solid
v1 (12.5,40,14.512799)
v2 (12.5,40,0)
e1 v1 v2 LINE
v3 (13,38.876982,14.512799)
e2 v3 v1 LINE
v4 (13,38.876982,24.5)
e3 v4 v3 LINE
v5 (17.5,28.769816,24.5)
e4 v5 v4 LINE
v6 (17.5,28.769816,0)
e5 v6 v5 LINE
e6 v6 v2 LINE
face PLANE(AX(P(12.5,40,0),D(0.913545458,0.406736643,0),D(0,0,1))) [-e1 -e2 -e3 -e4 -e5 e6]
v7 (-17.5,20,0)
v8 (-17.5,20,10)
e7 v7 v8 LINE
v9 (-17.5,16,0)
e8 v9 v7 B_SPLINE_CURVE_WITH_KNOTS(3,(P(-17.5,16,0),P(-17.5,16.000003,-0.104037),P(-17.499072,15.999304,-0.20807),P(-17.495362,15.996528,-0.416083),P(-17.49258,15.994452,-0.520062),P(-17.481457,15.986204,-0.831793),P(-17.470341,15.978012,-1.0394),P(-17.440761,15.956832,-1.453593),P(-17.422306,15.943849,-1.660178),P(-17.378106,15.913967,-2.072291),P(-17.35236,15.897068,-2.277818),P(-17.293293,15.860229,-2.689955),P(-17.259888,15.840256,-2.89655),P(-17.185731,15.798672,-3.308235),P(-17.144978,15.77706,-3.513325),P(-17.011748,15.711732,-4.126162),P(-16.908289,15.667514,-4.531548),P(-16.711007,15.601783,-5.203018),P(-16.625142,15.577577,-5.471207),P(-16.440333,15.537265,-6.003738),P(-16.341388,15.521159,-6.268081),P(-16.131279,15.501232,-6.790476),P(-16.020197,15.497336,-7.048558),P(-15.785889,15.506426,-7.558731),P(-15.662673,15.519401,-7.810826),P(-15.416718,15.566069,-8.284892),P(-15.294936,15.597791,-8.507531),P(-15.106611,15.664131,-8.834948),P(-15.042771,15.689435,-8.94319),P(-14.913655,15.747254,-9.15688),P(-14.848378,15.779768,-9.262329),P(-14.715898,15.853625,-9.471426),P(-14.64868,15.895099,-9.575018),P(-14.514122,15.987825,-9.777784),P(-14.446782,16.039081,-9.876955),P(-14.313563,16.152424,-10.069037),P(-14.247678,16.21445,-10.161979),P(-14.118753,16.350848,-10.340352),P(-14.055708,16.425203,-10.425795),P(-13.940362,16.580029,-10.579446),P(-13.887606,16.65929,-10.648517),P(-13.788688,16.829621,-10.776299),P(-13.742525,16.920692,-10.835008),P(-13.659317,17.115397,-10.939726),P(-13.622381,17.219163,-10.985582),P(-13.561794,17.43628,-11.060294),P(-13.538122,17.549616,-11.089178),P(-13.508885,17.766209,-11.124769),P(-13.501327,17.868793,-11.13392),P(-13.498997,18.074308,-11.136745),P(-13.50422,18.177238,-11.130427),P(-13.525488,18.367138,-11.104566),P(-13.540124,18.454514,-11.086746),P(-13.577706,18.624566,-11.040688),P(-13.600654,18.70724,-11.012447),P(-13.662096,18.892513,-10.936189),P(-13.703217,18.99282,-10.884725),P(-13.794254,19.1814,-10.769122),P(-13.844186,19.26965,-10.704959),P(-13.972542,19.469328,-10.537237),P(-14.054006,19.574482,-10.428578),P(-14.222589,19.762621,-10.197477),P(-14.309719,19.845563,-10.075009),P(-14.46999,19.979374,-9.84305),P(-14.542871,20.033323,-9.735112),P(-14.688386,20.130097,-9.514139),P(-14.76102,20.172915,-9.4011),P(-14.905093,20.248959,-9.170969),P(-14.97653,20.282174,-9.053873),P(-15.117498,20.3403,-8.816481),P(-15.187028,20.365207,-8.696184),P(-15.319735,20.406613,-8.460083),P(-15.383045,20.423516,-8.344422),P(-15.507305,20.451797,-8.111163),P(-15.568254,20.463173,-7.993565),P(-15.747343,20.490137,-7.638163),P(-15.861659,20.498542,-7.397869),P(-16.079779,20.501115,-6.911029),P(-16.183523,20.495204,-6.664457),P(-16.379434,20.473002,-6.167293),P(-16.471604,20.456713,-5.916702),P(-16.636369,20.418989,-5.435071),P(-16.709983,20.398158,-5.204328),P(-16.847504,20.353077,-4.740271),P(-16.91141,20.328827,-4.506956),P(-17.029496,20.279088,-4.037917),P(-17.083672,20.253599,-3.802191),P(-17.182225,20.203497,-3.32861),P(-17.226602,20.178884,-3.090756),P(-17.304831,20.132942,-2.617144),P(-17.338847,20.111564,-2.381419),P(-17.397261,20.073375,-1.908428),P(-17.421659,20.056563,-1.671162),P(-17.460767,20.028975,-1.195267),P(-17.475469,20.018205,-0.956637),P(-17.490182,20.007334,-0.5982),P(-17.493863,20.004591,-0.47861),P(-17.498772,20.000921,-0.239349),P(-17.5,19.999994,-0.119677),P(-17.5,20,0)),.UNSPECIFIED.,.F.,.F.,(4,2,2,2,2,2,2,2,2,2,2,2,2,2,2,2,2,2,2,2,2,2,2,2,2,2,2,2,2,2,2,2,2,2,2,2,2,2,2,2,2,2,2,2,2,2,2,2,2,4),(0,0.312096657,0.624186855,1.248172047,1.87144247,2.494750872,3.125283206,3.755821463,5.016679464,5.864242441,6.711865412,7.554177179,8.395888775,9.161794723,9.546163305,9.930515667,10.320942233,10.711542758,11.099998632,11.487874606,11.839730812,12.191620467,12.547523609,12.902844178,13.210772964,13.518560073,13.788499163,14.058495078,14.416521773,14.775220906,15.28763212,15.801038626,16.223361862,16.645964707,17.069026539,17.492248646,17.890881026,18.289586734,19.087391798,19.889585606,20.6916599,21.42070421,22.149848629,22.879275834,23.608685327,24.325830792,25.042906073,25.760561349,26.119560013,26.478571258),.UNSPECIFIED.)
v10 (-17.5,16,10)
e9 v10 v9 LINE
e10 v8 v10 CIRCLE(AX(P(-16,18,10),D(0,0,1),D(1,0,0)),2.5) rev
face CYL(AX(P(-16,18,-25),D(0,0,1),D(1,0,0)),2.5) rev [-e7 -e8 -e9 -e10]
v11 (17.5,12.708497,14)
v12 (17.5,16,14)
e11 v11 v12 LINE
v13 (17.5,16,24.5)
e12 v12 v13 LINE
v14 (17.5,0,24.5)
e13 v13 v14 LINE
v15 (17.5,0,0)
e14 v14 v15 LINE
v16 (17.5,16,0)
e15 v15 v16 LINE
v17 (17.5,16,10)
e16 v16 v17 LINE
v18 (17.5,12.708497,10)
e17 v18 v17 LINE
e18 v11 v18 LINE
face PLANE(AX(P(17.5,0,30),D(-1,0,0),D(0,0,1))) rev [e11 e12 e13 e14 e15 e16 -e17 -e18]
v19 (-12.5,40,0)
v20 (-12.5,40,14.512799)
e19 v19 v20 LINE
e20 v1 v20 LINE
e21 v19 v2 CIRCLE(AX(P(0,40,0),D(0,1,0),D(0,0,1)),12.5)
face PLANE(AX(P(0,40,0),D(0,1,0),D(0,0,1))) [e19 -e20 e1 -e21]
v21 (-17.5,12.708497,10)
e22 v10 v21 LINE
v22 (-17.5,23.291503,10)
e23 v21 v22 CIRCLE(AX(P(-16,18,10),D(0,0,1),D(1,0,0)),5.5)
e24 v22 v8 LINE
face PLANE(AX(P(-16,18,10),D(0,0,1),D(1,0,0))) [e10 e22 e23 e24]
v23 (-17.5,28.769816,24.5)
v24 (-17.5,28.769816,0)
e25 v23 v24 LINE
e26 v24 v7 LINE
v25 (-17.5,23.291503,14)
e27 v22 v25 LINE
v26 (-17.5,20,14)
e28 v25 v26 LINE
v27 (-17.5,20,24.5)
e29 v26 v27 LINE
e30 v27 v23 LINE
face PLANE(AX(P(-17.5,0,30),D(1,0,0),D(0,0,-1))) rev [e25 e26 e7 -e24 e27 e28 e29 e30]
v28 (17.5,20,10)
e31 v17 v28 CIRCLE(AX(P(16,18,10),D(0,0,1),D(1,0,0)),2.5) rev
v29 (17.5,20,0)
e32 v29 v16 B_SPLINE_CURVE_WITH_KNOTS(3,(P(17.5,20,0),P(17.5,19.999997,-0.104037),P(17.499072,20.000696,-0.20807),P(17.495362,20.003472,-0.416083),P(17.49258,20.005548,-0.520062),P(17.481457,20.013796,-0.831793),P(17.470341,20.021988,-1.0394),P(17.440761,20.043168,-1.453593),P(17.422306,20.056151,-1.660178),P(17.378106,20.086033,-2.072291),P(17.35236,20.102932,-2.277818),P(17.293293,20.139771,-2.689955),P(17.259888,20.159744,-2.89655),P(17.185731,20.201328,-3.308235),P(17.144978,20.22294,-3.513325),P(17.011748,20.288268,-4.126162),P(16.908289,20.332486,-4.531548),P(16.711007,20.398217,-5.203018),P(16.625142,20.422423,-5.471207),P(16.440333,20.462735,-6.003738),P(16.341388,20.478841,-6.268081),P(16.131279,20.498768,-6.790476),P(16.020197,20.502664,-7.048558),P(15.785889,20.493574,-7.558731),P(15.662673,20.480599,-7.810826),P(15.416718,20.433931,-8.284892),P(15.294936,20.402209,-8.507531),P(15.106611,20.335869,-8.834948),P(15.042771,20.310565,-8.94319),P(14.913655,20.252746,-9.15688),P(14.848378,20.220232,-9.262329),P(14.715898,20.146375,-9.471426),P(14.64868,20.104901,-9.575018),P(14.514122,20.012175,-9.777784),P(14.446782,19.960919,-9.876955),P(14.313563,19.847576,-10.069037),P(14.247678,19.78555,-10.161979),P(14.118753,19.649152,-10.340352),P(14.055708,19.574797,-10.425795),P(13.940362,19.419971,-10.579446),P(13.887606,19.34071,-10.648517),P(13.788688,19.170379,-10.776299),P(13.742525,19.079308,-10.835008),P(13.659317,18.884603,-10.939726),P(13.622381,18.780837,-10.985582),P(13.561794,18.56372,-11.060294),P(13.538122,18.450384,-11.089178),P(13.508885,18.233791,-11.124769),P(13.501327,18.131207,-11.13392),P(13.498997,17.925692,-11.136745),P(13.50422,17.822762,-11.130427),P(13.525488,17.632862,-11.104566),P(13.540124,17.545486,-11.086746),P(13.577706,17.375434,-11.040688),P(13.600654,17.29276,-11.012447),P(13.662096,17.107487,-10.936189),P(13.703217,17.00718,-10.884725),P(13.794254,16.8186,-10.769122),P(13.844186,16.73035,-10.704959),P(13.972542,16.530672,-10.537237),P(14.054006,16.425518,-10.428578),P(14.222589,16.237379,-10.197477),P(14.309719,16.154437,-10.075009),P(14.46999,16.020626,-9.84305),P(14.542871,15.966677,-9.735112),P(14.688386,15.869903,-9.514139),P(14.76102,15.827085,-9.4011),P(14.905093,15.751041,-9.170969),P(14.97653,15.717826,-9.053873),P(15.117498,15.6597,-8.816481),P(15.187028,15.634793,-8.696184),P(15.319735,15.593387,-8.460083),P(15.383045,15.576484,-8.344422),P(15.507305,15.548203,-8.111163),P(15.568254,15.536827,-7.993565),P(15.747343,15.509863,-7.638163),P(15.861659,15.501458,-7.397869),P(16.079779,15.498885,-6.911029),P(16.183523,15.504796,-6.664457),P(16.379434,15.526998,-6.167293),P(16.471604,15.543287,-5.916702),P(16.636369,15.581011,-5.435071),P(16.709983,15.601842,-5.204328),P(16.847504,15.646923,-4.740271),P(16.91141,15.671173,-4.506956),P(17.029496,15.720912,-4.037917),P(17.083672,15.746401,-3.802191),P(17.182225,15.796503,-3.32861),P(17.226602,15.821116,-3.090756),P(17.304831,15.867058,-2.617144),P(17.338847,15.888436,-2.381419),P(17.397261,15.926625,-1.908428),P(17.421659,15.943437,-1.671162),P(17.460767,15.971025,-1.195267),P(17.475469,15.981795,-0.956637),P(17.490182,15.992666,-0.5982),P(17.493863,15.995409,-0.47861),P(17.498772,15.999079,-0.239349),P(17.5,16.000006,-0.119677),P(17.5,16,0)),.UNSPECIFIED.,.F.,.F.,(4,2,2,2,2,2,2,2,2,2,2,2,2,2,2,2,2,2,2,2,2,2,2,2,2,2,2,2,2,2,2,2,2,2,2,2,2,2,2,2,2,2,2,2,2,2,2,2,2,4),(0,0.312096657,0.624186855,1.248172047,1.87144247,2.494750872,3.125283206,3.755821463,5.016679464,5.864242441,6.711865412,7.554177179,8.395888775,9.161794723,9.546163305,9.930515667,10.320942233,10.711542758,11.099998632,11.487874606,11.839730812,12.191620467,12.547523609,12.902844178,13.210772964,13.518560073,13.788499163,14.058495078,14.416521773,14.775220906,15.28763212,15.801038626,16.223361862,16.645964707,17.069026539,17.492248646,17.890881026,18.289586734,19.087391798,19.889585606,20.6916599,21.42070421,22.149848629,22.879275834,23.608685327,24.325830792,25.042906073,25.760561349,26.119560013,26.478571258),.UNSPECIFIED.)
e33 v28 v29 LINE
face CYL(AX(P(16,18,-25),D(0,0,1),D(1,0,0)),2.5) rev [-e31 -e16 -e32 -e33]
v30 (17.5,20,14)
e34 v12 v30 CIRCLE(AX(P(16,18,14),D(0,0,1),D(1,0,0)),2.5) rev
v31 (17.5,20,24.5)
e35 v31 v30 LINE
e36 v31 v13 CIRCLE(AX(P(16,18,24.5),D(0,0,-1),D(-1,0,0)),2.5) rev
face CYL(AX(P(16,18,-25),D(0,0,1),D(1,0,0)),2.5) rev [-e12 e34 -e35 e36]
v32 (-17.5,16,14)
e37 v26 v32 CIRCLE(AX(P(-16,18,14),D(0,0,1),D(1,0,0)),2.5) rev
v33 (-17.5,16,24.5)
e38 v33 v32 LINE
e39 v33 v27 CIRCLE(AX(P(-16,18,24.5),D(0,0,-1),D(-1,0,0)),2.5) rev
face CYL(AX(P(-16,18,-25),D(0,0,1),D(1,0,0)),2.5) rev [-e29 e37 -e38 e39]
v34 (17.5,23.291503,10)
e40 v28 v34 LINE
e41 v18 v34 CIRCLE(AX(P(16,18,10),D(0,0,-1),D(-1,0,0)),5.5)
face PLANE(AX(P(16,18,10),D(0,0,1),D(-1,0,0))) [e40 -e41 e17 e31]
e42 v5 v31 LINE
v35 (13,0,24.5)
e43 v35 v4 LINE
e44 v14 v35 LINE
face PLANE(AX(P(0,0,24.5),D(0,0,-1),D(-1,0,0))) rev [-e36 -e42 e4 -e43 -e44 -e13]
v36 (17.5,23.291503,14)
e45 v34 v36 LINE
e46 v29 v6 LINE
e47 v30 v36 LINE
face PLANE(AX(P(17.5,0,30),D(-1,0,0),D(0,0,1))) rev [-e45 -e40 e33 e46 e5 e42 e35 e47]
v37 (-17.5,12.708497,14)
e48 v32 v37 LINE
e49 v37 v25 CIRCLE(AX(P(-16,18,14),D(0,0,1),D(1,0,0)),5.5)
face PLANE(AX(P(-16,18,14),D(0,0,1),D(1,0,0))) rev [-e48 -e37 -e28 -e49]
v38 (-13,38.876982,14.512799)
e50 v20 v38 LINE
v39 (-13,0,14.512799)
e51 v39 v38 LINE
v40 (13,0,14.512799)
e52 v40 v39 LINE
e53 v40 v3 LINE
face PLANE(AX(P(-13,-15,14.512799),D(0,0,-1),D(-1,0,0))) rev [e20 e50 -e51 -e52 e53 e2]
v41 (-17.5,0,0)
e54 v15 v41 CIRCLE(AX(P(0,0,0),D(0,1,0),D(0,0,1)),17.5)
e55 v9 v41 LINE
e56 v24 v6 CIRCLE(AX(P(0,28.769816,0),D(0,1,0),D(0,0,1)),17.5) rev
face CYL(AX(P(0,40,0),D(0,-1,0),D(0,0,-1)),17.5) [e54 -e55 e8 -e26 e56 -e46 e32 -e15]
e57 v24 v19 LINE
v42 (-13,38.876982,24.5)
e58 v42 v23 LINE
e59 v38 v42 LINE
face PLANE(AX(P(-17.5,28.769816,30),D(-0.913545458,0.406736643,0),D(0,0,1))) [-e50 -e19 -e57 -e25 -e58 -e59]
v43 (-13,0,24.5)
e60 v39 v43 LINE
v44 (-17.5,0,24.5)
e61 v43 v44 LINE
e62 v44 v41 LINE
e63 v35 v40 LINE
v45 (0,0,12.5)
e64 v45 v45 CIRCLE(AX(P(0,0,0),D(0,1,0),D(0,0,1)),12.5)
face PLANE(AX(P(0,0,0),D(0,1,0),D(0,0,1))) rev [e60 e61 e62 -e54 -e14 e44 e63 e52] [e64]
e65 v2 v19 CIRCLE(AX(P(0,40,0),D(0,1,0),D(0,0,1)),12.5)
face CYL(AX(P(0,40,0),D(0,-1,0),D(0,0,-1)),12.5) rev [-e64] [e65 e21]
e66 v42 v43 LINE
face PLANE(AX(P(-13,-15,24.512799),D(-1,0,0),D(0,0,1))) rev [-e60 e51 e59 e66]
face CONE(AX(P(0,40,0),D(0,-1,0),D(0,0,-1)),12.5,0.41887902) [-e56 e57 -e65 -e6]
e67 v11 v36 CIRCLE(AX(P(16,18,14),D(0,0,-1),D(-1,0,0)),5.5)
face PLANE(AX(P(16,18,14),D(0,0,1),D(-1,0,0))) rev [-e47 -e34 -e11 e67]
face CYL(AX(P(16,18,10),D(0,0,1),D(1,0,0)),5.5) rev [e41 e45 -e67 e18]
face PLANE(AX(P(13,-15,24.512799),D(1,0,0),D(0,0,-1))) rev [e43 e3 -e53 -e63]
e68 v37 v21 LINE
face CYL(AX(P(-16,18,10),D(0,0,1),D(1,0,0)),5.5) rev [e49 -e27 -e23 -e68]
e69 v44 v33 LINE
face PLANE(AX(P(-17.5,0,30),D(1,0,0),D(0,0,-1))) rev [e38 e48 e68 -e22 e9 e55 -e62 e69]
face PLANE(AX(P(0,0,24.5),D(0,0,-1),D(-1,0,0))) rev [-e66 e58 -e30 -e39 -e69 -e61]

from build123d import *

# Parameters (mm, degrees)
CROQUIS1_R              = 17.5
CROQUIS1_R_2            = 12.5
SALIENTE_EXTRUIR1_DEPTH = 40
CROQUIS2_W              = 35
CROQUIS2_H              = 40
SALIENTE_EXTRUIR2_DEPTH = 30
CORTAR_EXTRUIR1_START   = -55
CROQUIS3_R              = 12.5
CORTAR_EXTRUIR1_DEPTH   = 55
CROQUIS4_W              = 26
CROQUIS4_H              = 10
CORTAR_EXTRUIR2_DEPTH   = 55
CROQUIS5_R              = 2.5
CORTAR_EXTRUIR3_DEPTH   = 55
CHAFL_N1_SIZE           = 5
CHAFL_N1_SIZE_2         = 11.23018387
CROQUIS6_W              = 43.374633734
CROQUIS6_H              = 44.438316851
CORTAR_EXTRUIR4_DEPTH   = 5.5
CROQUIS7_R              = 5.5
CORTAR_EXTRUIR5_DEPTH   = 4


with BuildPart() as part:
    # Croquis1 → Saliente-Extruir1 (new body)
    with BuildSketch(Plane(origin=(0, 0, 0), x_dir=(1, 0, 0), z_dir=(0, 1, 0))):
        with Locations(Location((0, 0, 0), (0, 0, 270))):
            Circle(CROQUIS1_R)
        with Locations(Location((0, 0, 0), (0, 0, 270))):
            Circle(CROQUIS1_R_2, mode=Mode.SUBTRACT)
    extrude(amount=SALIENTE_EXTRUIR1_DEPTH)

    # Croquis2 → Saliente-Extruir2 (add)
    with BuildSketch(Plane.XY):
        with Locations((0, 20)):
            Rectangle(CROQUIS2_W, CROQUIS2_H)
    extrude(amount=SALIENTE_EXTRUIR2_DEPTH)

    # Croquis3 → Cortar-Extruir1 (cut)
    with BuildSketch(Plane(origin=(0, 40, 0), x_dir=(1, 0, 0), z_dir=(0, 1, 0)).offset(CORTAR_EXTRUIR1_START)):
        with Locations(Location((0, 0, 0), (0, 0, 270))):
            Circle(CROQUIS3_R)
    extrude(amount=CORTAR_EXTRUIR1_DEPTH, mode=Mode.SUBTRACT)

    # Croquis4 → Cortar-Extruir2 (cut)
    with BuildSketch(Plane(origin=(0, 40, 0), x_dir=(1, 0, 0), z_dir=(0, 1, 0))):
        with Locations((0, -19.512798854)):
            Rectangle(CROQUIS4_W, CROQUIS4_H)
    extrude(amount=-CORTAR_EXTRUIR2_DEPTH, mode=Mode.SUBTRACT)

    # Croquis5 → Cortar-Extruir3 (cut)
    with BuildSketch(Plane.XY.offset(30)):
        with Locations((16, 18)):
            Circle(CROQUIS5_R)
        with Locations((-16, 18)):
            Circle(CROQUIS5_R)
    extrude(amount=-CORTAR_EXTRUIR3_DEPTH, mode=Mode.SUBTRACT)

    # Chaflán1
    # the kernel refuses this chamfer: 11.23018387, 5 mm, written as the material it takes off along each edge
    with BuildSketch(Plane(origin=(17.5, 40, 0), x_dir=(-0.9968798599783936, 0.07893379991777015, 0), z_dir=(0, 0, 1))) as chafl_n1_piece_1:
        Polygon((CHAFL_N1_SIZE * 0.996879859978, CHAFL_N1_SIZE * 0.0789337999178), (-CHAFL_N1_SIZE_2 * 0.0789337999144, CHAFL_N1_SIZE_2 * 0.996879859936), (0, 0), align=None)
    extrude(amount=59.104972531, mode=Mode.SUBTRACT)
    with BuildSketch(Plane(origin=(-17.5, 40, 0), x_dir=(0.9968798599783936, 0.07893379991777015, 0), z_dir=(0, 0, 1))) as chafl_n1_piece_2:
        Polygon((CHAFL_N1_SIZE * 0.996879859978, -CHAFL_N1_SIZE * 0.0789337999178), (-CHAFL_N1_SIZE_2 * 0.0789337999144, -CHAFL_N1_SIZE_2 * 0.996879859936), (0, 0), align=None)
    extrude(amount=59.104972531, mode=Mode.SUBTRACT)
    with BuildSketch(Plane(origin=(0, 40, 0), x_dir=(1, 0, 0), z_dir=(0, 0, 1))) as chafl_n1_piece_3:
        Polygon((17.5 - CHAFL_N1_SIZE, 0), (17.5, -CHAFL_N1_SIZE_2), (17.5, 0), align=None)
    revolve(axis=Axis((0, 40, 0), (0, 1, 0)), revolution_arc=180, mode=Mode.SUBTRACT)

    # Croquis6 → Cortar-Extruir4 (cut)
    with BuildSketch(Plane.XY.offset(30)):
        with Locations((0, 20.325014285)):
            Rectangle(CROQUIS6_W, CROQUIS6_H)
    extrude(amount=-CORTAR_EXTRUIR4_DEPTH, mode=Mode.SUBTRACT)

    # Croquis7 → Cortar-Extruir5 (cut)
    with BuildSketch(Plane.XY.offset(14)):
        with Locations((-16, 18)):
            Circle(CROQUIS7_R)
    cortar_extruir5 = extrude(amount=-CORTAR_EXTRUIR5_DEPTH, mode=Mode.SUBTRACT)

    # Simetría1: Cortar-Extruir5 across plane
    add(cortar_extruir5.mirror(Plane(origin=(0, 0, 0), x_dir=(0, 0, 1), z_dir=(1, 0, 0))), mode=Mode.SUBTRACT)


solid = part.part
